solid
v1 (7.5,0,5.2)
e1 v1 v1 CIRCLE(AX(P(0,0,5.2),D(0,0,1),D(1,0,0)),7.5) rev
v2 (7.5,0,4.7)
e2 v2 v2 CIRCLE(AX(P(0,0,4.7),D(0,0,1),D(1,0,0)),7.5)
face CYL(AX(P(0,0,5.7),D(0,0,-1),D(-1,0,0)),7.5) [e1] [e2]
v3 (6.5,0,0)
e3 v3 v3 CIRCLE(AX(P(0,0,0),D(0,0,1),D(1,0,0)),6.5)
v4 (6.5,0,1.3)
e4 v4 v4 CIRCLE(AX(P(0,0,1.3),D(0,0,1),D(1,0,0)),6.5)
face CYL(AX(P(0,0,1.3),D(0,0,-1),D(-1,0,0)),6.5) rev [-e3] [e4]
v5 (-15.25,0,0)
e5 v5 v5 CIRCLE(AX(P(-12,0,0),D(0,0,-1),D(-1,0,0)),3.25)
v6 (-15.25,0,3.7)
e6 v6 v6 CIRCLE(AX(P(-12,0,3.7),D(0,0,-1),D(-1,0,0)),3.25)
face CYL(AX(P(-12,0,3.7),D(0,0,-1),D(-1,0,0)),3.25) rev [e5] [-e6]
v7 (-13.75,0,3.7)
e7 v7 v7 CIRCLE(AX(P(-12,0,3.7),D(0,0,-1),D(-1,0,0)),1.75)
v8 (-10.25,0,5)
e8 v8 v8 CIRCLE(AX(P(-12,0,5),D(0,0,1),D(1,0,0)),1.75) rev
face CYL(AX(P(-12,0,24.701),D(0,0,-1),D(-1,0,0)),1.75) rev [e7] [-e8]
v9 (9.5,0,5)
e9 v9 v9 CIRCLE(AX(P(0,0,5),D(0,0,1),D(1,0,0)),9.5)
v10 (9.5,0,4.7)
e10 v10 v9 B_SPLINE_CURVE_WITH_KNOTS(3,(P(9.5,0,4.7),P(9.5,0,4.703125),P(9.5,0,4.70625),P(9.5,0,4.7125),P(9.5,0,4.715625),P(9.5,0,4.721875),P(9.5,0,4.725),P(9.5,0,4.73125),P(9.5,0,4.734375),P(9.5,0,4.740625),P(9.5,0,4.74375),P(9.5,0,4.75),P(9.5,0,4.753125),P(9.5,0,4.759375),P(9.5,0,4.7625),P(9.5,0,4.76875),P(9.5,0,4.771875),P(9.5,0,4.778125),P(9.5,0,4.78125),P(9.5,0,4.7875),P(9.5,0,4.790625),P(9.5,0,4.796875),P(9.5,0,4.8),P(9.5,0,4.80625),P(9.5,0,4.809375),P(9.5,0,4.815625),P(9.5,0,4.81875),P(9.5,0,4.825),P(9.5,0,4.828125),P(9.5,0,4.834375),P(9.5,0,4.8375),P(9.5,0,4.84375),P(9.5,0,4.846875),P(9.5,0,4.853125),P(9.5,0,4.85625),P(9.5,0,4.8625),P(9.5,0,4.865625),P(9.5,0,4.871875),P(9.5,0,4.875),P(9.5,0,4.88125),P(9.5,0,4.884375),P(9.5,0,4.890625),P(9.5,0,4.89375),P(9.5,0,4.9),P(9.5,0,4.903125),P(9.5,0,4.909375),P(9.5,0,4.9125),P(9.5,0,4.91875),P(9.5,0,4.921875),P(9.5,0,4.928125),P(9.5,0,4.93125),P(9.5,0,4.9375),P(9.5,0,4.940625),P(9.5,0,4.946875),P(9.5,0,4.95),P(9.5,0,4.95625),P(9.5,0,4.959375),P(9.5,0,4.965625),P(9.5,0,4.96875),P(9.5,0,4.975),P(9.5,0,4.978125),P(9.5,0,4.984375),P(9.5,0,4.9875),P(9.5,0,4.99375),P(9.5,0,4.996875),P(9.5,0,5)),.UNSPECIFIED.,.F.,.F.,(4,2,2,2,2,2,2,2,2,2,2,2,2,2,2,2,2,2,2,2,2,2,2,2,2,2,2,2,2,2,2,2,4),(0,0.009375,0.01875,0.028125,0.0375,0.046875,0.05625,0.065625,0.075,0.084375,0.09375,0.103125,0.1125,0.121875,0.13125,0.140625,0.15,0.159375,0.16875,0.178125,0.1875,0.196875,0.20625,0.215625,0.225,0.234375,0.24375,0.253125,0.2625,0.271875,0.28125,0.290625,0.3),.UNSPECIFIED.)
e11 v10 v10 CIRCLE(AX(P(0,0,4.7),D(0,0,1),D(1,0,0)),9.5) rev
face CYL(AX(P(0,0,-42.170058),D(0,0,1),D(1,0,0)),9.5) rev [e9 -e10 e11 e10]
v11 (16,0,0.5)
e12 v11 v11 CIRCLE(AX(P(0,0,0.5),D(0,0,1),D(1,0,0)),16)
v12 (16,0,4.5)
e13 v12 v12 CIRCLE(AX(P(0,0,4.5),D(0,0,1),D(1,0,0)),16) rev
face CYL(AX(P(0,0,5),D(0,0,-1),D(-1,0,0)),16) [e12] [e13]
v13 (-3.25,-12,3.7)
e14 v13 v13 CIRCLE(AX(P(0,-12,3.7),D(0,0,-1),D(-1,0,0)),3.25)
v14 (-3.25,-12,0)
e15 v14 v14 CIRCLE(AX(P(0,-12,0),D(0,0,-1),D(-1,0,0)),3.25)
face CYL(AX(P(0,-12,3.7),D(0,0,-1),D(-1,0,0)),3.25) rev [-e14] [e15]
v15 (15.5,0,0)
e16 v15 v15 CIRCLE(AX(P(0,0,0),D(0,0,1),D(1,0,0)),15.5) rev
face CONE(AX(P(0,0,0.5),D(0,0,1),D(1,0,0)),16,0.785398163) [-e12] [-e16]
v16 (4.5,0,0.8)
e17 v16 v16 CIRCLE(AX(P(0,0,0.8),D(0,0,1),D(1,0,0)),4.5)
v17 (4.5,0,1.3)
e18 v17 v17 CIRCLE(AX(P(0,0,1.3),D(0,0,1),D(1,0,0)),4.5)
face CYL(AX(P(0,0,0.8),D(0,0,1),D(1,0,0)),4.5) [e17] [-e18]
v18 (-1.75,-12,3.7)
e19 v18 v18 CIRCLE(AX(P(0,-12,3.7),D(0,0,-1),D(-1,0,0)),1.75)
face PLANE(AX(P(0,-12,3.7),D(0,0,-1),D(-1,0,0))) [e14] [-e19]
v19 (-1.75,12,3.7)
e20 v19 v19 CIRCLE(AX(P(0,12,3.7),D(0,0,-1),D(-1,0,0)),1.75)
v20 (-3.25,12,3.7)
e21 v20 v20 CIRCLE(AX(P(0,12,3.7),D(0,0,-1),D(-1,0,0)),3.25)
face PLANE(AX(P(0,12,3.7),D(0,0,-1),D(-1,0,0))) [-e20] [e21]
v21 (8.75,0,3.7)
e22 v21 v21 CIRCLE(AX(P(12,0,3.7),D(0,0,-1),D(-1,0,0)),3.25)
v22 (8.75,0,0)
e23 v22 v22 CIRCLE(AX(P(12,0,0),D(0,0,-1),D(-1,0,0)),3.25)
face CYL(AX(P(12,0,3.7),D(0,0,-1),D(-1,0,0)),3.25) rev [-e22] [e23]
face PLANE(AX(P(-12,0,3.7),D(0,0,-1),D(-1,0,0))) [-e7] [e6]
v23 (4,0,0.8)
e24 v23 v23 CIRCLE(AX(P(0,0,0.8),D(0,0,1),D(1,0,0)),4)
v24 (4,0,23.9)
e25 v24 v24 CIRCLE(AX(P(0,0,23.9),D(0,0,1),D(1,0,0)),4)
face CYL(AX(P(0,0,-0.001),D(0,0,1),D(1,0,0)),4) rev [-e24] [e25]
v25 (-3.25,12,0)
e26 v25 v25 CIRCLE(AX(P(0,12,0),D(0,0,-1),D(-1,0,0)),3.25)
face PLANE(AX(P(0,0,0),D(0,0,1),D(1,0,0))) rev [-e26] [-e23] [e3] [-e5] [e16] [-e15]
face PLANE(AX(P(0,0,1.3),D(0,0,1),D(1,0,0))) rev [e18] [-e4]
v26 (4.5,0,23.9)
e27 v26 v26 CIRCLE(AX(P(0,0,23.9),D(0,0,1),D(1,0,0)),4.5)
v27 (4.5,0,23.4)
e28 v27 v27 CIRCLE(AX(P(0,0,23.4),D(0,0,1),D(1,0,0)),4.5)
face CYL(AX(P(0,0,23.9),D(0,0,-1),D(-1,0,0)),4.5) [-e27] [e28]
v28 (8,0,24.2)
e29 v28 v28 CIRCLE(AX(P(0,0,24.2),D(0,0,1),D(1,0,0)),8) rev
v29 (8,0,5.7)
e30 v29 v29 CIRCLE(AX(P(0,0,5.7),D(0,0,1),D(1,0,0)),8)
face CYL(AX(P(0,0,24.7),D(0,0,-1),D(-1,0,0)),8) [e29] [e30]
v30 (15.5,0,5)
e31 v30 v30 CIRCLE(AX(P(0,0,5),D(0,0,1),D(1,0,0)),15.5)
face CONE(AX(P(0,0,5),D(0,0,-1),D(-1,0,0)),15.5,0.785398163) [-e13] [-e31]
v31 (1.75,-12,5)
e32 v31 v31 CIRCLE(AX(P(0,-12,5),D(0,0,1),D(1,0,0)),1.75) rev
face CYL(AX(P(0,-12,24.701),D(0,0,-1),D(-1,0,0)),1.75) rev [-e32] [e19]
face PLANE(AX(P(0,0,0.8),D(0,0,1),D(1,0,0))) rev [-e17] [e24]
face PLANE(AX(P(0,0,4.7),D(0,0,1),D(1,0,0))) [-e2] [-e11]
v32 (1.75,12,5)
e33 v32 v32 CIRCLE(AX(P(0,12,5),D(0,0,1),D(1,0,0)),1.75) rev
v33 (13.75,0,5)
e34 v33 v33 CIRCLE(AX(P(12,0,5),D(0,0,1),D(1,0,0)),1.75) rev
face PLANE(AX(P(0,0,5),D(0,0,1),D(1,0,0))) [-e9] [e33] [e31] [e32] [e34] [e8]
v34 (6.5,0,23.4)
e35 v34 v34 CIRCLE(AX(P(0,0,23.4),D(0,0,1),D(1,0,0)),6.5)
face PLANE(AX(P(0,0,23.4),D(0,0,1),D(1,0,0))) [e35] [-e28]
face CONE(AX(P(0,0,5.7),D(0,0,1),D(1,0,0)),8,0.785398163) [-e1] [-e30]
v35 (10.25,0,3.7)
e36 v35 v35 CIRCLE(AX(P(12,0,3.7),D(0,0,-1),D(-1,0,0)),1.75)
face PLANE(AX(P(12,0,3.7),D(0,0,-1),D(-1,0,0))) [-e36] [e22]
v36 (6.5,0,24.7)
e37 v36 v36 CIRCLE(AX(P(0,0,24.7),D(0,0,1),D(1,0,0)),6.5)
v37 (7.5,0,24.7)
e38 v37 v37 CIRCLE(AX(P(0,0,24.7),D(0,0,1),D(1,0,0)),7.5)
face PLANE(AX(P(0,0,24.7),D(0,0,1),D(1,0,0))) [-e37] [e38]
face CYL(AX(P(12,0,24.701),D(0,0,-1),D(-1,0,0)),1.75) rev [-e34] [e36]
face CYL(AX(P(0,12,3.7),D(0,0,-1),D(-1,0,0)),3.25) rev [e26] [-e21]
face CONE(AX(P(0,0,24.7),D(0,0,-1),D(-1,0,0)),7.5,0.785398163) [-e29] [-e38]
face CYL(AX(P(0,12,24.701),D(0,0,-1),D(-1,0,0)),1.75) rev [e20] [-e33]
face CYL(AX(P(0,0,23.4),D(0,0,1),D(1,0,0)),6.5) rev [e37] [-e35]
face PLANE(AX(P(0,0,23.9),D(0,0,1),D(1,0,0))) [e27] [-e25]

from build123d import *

# Parameters (mm, degrees)
IZIM1_R                     = 16
Y_KSEKLIK_EKSTR_ZYON1_DEPTH = 5
IZIM2_R                     = 8
Y_KSEKLIK_EKSTR_ZYON2_DEPTH = 19.7
KES_EKSTR_ZYON1_REACH       = 35.498
IZIM3_R                     = 4
KES_EKSTR_ZYON2_REACH       = 35.498
IZIM4_R                     = 1.75
IZIM4_3_R                   = 3.25
IZIM4_3_R_2                 = 1.75
KES_EKSTR_ZYON3_DEPTH       = 3.7
IZIM5_R                     = 6.5
KES_EKSTR_ZYON4_DEPTH       = 1.3
KES_EKSTR_ZYON5_START       = -23.4
IZIM5_2_R                   = 6.5
KES_EKSTR_ZYON5_DEPTH       = 1.3
KES_EKSTR_ZYON7_START       = -0.3
IZIM7_R                     = 9.5
IZIM7_R_2                   = 8
KES_EKSTR_ZYON7_DEPTH       = 0.3
IZIM8_R                     = 8
IZIM8_R_2                   = 7.5
KES_EKSTR_ZYON8_DEPTH       = 1
PAH1_SIZE                   = 0.5
Y_KSEKLIK_EKSTR_ZYON3_START = 0.5
IZIM9_R                     = 4.5
IZIM9_R_2                   = 4
Y_KSEKLIK_EKSTR_ZYON3_DEPTH = 0.5
Y_KSEKLIK_EKSTR_ZYON4_START = -22.1
IZIM9_2_R                   = 4.5
IZIM9_2_R_2                 = 4
Y_KSEKLIK_EKSTR_ZYON4_DEPTH = 0.5
PAH2_SIZE                   = 0.5


with BuildPart() as part:
    # Çizim1 → Yükseklik-Ekstrüzyon1 (new body)
    with BuildSketch(Plane.XY):
        Circle(IZIM1_R)
    extrude(amount=Y_KSEKLIK_EKSTR_ZYON1_DEPTH)

    # Çizim2 → Yükseklik-Ekstrüzyon2 (add)
    with BuildSketch(Plane.XY.offset(5)):
        Circle(IZIM2_R)
    extrude(amount=Y_KSEKLIK_EKSTR_ZYON2_DEPTH)

    # Çizim3 → Kes-Ekstrüzyon1 (cut, up to next)
    with BuildSketch(Plane.XY.offset(24.7), mode=Mode.PRIVATE) as kes_ekstr_zyon1_sk1:
        Circle(IZIM3_R)
    kes_ekstr_zyon1_tool1 = extrude(kes_ekstr_zyon1_sk1.sketch, amount=-KES_EKSTR_ZYON1_REACH, mode=Mode.PRIVATE) & part.part
    add(kes_ekstr_zyon1_tool1.solids().sort_by_distance((0, 0, 24.7))[0], mode=Mode.SUBTRACT)

    # Çizim4 → Kes-Ekstrüzyon2 (cut, up to next)
    with BuildSketch(Plane(origin=(0, 0, 0), x_dir=(-1, 0, 0), z_dir=(0, 0, -1)), mode=Mode.PRIVATE) as kes_ekstr_zyon2_sk1:
        with Locations((0, 12)):
            Circle(IZIM4_R)
    kes_ekstr_zyon2_tool1 = extrude(kes_ekstr_zyon2_sk1.sketch, amount=-KES_EKSTR_ZYON2_REACH, mode=Mode.PRIVATE) & part.part
    # Çizim4 → Kes-Ekstrüzyon2 (cut, up to next)
    with BuildSketch(Plane(origin=(0, 0, 0), x_dir=(-1, 0, 0), z_dir=(0, 0, -1)), mode=Mode.PRIVATE) as kes_ekstr_zyon2_sk2:
        with Locations((12, 0)):
            Circle(IZIM4_R)
    kes_ekstr_zyon2_tool2 = extrude(kes_ekstr_zyon2_sk2.sketch, amount=-KES_EKSTR_ZYON2_REACH, mode=Mode.PRIVATE) & part.part
    # Çizim4 → Kes-Ekstrüzyon2 (cut, up to next)
    with BuildSketch(Plane(origin=(0, 0, 0), x_dir=(-1, 0, 0), z_dir=(0, 0, -1)), mode=Mode.PRIVATE) as kes_ekstr_zyon2_sk3:
        with Locations((0, -12)):
            Circle(IZIM4_R)
    kes_ekstr_zyon2_tool3 = extrude(kes_ekstr_zyon2_sk3.sketch, amount=-KES_EKSTR_ZYON2_REACH, mode=Mode.PRIVATE) & part.part
    # Çizim4 → Kes-Ekstrüzyon2 (cut, up to next)
    with BuildSketch(Plane(origin=(0, 0, 0), x_dir=(-1, 0, 0), z_dir=(0, 0, -1)), mode=Mode.PRIVATE) as kes_ekstr_zyon2_sk4:
        with Locations((-12, 0)):
            Circle(IZIM4_R)
    kes_ekstr_zyon2_tool4 = extrude(kes_ekstr_zyon2_sk4.sketch, amount=-KES_EKSTR_ZYON2_REACH, mode=Mode.PRIVATE) & part.part
    add(kes_ekstr_zyon2_tool1.solids().sort_by_distance((0, 12, 0))[0], mode=Mode.SUBTRACT)
    add(kes_ekstr_zyon2_tool2.solids().sort_by_distance((-12, 0, 0))[0], mode=Mode.SUBTRACT)
    add(kes_ekstr_zyon2_tool3.solids().sort_by_distance((0, -12, 0))[0], mode=Mode.SUBTRACT)
    add(kes_ekstr_zyon2_tool4.solids().sort_by_distance((12, 0, 0))[0], mode=Mode.SUBTRACT)

    # Çizim4<3> → Kes-Ekstrüzyon3 (cut)
    # profile 1 of 4: a face of its own
    with BuildSketch(Plane(origin=(0, 0, 0), x_dir=(-1, 0, 0), z_dir=(0, 0, -1))):
        with Locations((0, 12)):
            Circle(IZIM4_3_R)
        with Locations((0, 12)):
            Circle(IZIM4_3_R_2, mode=Mode.SUBTRACT)
    # profile 2 of 4: a face of its own
    with BuildSketch(Plane(origin=(0, 0, 0), x_dir=(-1, 0, 0), z_dir=(0, 0, -1))):
        with Locations((12, 0)):
            Circle(IZIM4_3_R)
        with Locations((12, 0)):
            Circle(IZIM4_3_R_2, mode=Mode.SUBTRACT)
    # profile 3 of 4: a face of its own
    with BuildSketch(Plane(origin=(0, 0, 0), x_dir=(-1, 0, 0), z_dir=(0, 0, -1))):
        with Locations((0, -12)):
            Circle(IZIM4_3_R)
        with Locations((0, -12)):
            Circle(IZIM4_3_R_2, mode=Mode.SUBTRACT)
    # profile 4 of 4: a face of its own
    with BuildSketch(Plane(origin=(0, 0, 0), x_dir=(-1, 0, 0), z_dir=(0, 0, -1))):
        with Locations((-12, 0)):
            Circle(IZIM4_3_R)
        with Locations((-12, 0)):
            Circle(IZIM4_3_R_2, mode=Mode.SUBTRACT)
    extrude(amount=-KES_EKSTR_ZYON3_DEPTH, mode=Mode.SUBTRACT)

    # Çizim5 → Kes-Ekstrüzyon4 (cut)
    with BuildSketch(Plane.XY.offset(24.7)):
        Circle(IZIM5_R)
    extrude(amount=-KES_EKSTR_ZYON4_DEPTH, mode=Mode.SUBTRACT)

    # Çizim5<2> → Kes-Ekstrüzyon5 (cut)
    with BuildSketch(Plane.XY.offset(24.7).offset(KES_EKSTR_ZYON5_START)):
        Circle(IZIM5_2_R)
    extrude(amount=-KES_EKSTR_ZYON5_DEPTH, mode=Mode.SUBTRACT)

    # Çizim7 → Kes-Ekstrüzyon7 (cut)
    with BuildSketch(Plane.XY.offset(5).offset(KES_EKSTR_ZYON7_START)):
        Circle(IZIM7_R)
        Circle(IZIM7_R_2, mode=Mode.SUBTRACT)
    extrude(amount=KES_EKSTR_ZYON7_DEPTH, mode=Mode.SUBTRACT)

    # Çizim8 → Kes-Ekstrüzyon8 (cut)
    with BuildSketch(Plane.XY.offset(4.7)):
        Circle(IZIM8_R)
        Circle(IZIM8_R_2, mode=Mode.SUBTRACT)
    extrude(amount=KES_EKSTR_ZYON8_DEPTH, mode=Mode.SUBTRACT)

    # Pah1
    pah1_edges = [part.edges().sort_by_distance(p)[0] for p in [
        (-7.5, 0, 5.7),
    ]]
    chamfer(pah1_edges, length=PAH1_SIZE - 0.0001)  # a hair under: the kernel refuses the full size

    # Çizim9 → Yükseklik-Ekstrüzyon3 (add)
    with BuildSketch(Plane.XY.offset(23.4).offset(Y_KSEKLIK_EKSTR_ZYON3_START)):
        Circle(IZIM9_R)
        Circle(IZIM9_R_2, mode=Mode.SUBTRACT)
    extrude(amount=-Y_KSEKLIK_EKSTR_ZYON3_DEPTH)

    # Çizim9<2> → Yükseklik-Ekstrüzyon4 (add)
    with BuildSketch(Plane.XY.offset(23.4).offset(Y_KSEKLIK_EKSTR_ZYON4_START)):
        Circle(IZIM9_2_R)
        Circle(IZIM9_2_R_2, mode=Mode.SUBTRACT)
    extrude(amount=-Y_KSEKLIK_EKSTR_ZYON4_DEPTH)

    # Pah2
    pah2_edges = [part.edges().sort_by_distance(p)[0] for p in [
        (-16, 0, 0),
        (-16, 0, 5),
        (-8, 0, 24.7),
    ]]
    chamfer(pah2_edges, length=PAH2_SIZE)


solid = part.part
